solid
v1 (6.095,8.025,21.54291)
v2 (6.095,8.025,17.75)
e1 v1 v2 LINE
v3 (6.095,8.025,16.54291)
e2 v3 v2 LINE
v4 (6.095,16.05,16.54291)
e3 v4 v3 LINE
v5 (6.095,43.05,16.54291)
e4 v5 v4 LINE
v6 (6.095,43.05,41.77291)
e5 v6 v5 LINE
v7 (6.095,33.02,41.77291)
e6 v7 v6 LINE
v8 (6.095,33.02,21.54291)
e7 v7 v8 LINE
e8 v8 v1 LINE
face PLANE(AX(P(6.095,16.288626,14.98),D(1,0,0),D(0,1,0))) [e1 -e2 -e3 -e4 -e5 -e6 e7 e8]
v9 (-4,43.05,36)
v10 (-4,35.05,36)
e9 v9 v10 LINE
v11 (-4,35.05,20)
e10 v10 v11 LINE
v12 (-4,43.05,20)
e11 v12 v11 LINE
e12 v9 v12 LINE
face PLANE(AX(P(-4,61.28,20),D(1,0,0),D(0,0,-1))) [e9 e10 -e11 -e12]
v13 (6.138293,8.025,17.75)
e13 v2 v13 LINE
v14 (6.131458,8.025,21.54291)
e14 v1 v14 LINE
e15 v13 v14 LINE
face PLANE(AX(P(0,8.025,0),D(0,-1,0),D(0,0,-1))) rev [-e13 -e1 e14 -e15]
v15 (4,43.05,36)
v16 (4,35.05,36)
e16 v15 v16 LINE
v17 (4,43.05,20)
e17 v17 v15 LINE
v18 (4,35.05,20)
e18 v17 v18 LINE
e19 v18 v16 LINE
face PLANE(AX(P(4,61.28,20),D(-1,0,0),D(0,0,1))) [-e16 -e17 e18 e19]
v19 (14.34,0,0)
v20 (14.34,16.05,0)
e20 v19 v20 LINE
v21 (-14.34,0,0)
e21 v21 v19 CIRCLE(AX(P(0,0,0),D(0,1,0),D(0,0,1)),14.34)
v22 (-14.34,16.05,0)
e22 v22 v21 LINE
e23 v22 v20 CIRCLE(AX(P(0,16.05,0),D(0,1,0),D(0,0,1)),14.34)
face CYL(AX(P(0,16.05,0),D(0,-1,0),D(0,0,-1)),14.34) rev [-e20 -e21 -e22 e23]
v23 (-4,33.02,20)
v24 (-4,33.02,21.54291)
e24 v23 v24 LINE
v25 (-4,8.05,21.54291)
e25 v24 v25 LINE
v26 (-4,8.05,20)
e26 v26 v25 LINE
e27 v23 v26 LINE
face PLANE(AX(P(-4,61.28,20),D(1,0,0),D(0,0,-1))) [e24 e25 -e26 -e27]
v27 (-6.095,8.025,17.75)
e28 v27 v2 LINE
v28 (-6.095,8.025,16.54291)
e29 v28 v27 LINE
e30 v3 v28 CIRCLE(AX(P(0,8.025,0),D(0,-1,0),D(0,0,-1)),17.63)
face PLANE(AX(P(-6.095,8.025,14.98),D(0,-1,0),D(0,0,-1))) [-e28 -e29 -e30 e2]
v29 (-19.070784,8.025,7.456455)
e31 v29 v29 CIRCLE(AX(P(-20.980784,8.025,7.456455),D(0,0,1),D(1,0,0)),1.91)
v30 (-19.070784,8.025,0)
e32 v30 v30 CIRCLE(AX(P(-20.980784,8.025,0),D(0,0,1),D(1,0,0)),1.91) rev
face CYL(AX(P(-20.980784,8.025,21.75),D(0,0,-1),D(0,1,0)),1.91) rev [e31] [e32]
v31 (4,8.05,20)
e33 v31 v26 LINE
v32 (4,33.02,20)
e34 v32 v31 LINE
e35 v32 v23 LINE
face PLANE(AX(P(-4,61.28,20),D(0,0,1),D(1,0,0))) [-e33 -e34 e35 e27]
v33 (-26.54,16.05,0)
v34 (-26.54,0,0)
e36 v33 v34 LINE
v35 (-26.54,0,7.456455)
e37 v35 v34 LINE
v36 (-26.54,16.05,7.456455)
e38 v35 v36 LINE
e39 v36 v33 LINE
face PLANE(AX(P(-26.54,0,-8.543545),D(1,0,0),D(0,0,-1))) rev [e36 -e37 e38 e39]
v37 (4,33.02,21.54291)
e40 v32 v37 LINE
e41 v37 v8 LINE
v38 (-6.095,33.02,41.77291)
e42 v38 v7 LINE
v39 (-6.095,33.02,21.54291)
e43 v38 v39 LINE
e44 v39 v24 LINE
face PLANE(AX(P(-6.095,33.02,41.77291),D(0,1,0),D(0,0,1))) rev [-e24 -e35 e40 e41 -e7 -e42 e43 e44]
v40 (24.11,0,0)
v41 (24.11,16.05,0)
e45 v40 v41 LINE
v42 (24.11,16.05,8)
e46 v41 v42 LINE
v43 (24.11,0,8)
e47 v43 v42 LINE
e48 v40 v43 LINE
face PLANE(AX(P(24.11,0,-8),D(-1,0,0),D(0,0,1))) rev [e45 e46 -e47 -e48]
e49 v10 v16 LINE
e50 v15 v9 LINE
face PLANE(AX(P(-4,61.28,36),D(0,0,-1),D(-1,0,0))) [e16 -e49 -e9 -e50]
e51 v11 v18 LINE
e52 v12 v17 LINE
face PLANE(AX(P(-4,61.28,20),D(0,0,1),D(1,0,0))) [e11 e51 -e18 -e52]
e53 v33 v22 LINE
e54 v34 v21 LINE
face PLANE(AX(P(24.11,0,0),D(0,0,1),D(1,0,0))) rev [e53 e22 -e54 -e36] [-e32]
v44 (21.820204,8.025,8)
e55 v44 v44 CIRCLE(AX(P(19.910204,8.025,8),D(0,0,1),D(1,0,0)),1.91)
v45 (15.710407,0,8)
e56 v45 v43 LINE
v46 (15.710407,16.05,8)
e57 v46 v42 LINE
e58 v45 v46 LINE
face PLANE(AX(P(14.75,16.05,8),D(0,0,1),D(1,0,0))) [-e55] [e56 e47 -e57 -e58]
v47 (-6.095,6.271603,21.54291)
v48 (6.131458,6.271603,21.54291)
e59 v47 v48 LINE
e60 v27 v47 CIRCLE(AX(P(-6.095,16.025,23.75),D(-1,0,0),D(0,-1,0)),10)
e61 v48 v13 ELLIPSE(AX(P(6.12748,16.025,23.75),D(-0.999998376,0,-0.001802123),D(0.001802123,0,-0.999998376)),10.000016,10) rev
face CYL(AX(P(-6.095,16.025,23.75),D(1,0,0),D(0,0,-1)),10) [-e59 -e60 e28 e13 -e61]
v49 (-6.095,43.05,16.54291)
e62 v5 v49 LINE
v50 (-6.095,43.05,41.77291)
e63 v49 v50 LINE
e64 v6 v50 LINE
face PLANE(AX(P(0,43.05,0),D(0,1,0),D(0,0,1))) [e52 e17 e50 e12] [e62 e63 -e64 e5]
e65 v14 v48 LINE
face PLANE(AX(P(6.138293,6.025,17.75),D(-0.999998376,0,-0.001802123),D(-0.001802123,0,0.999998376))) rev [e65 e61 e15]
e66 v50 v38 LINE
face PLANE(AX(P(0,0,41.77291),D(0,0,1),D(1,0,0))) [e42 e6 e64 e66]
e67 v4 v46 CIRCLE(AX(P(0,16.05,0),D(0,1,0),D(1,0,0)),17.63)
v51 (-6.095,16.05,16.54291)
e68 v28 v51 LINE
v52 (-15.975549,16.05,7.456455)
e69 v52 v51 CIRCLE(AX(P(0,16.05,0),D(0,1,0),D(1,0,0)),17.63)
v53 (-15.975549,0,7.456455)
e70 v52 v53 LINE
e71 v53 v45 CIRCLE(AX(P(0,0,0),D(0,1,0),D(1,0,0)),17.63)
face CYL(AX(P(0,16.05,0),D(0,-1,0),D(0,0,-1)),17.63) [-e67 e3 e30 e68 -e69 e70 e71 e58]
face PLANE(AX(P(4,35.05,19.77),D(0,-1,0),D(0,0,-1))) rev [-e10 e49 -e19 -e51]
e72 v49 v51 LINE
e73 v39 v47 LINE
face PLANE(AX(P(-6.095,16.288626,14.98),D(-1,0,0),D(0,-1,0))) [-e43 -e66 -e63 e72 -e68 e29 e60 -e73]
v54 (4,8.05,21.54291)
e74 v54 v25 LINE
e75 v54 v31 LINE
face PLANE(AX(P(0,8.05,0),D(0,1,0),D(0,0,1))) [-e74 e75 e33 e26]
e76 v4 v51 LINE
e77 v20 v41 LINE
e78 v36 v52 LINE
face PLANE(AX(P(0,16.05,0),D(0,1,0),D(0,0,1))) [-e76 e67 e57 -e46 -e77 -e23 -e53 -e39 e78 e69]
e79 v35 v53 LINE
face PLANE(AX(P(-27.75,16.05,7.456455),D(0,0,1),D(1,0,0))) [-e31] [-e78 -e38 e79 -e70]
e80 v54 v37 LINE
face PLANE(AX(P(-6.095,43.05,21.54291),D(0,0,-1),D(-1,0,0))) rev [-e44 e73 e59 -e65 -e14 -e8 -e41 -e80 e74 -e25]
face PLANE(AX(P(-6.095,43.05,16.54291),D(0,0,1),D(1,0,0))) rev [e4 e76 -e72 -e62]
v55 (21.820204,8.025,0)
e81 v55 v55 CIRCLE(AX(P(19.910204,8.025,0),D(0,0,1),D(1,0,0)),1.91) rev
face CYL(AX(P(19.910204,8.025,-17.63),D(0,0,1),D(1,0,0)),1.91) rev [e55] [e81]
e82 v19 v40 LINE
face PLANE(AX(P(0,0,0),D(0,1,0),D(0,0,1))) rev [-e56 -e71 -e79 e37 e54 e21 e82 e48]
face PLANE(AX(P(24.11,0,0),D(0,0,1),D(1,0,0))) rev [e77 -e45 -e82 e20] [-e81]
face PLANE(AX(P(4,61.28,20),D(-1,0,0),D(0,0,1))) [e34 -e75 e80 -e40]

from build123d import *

# Parameters (mm, degrees)
SKETCH_1_R                = 17.63
SKETCH_1_R_2              = 14.34
EXTRUDE_1_DEPTH           = 16.05
EXTRUDE_1_2_DEPTH         = 9.77
EXTRUDE_1_2_DEPTH_BACK    = 3
SKETCH_2_W                = 16
SKETCH_2_H                = 16.05
SKETCH_3_W                = 3.41
SKETCH_3_H                = 16
CUT_EXTRUDE_1_DEPTH       = 37.411121927
SKETCH_4_R                = 1.91
CUT_EXTRUDE_2_DEPTH       = 39.675463798
EXTRUDE_2_DEPTH           = 4
EXTRUDE_2_DEPTH_BACK      = 2.77
SKETCH_5_W                = 12.19
SKETCH_5_H                = 8.263625949
SKETCH_6_W                = 12.19
SKETCH_6_H                = 6.77
EXTRUDE_3_DEPTH           = 63
SKETCH_8_W                = 12.19
SKETCH_8_H                = 6.77
EXTRUDE_4_DEPTH           = 0.16
EXTRUDE_5_DEPTH           = 3.16
EXTRUDE_5_DEPTH_BACK      = 10
SKETCH_12_W               = 16
SKETCH_12_H               = 16.05
SKETCH_13_W               = 1.21
SKETCH_13_H               = 16
CUT_EXTRUDE_3_DEPTH       = 73.543164889
SKETCH_14_R               = 1.91
CUT_EXTRUDE_4_DEPTH       = 90.07387176
SKETCH_15_R               = 4.05
CUT_EXTRUDE_5_DEPTH       = 24
SKETCH_16_W               = 56.400519221
SKETCH_16_H               = 19.935010357
CUT_EXTRUDE_6_DEPTH       = 73.088971918
SKETCH_17_W               = 12.19
SKETCH_17_H               = 71.423625949
EXTRUDE_7_DEPTH           = 25
SKETCH_18_W               = 26.793372528
SKETCH_18_H               = 63.398625949
CUT_EXTRUDE_7_DEPTH       = 25
SKETCH_19_R               = 4
CUT_EXTRUDE_8_DEPTH       = 24
CUT_EXTRUDE_9_DEPTH       = 29
EXTRUDE_9_DEPTH           = 2
FILLET_1_R                = 10
SKETCH_24_W               = 12.19
SKETCH_24_H               = 5
EXTRUDE_10_DEPTH          = 27
SKETCH_27_W               = 12.19
SKETCH_27_H               = 10.03
EXTRUDE_11_DEPTH          = 20.23
CUT_EXTRUDE_10_DEPTH      = 45.23
CUT_EXTRUDE_10_DEPTH_BACK = 8
SKETCH_21_W               = 8
SKETCH_21_H               = 16
SKETCH_25_W               = 20.230462415
SKETCH_25_H               = 10.025
CUT_EXTRUDE_12_DEPTH      = 20.23
SKETCH_31_W               = 8
SKETCH_31_H               = 2.03
EXTRUDE_13_DEPTH          = 16.23


with BuildPart() as part:
    # 草圖1 → Extrude 1 (new body)
    with BuildSketch(Plane(origin=(0, 0, 0), x_dir=(1, 0, 0), z_dir=(0, 1, 0))):
        Circle(SKETCH_1_R)
        Circle(SKETCH_1_R_2, mode=Mode.SUBTRACT)
    extrude(amount=EXTRUDE_1_DEPTH)

    # 草圖2 → Extrude 1 2 (add, two sides: drawn at the far end of the back side and taken through both)
    with BuildSketch(Plane(origin=(17.75, 0, 0), x_dir=(0, 0, -1), z_dir=(1, 0, 0)).offset(-EXTRUDE_1_2_DEPTH_BACK)):
        with Locations((0, 8.025)):
            Rectangle(SKETCH_2_W, SKETCH_2_H)
    extrude(amount=EXTRUDE_1_2_DEPTH + EXTRUDE_1_2_DEPTH_BACK)

    # 草圖3 → 除料-伸長1 (cut, through all)
    with BuildSketch(Plane(origin=(0, 16.05, 0), x_dir=(1, 0, 0), z_dir=(0, 1, 0))):
        with Locations((25.815, 0)):
            Rectangle(SKETCH_3_W, SKETCH_3_H)
    extrude(amount=-CUT_EXTRUDE_1_DEPTH, mode=Mode.SUBTRACT)

    # 草圖4 → 除料-伸長2 (cut, through all)
    with BuildSketch(Plane.XY.offset(8)):
        with Locations((19.910203689, 8.025)):
            Circle(SKETCH_4_R)
    extrude(amount=-CUT_EXTRUDE_2_DEPTH, mode=Mode.SUBTRACT)

    # 草圖5 → 填料-伸長2 (add, two sides: drawn at the far end of the back side and taken through both)
    with BuildSketch(Plane.XY.offset(17.75).offset(-EXTRUDE_2_DEPTH_BACK)):
        with Locations((0, 12.156812974)):
            Rectangle(SKETCH_5_W, SKETCH_5_H)
    extrude(amount=EXTRUDE_2_DEPTH + EXTRUDE_2_DEPTH_BACK)

    # 草圖6 → 填料-伸長3 (add)
    with BuildSketch(Plane(origin=(0, 16.288625949, 0), x_dir=(1, 0, 0), z_dir=(0, 1, 0))):
        with Locations((0, -18.365)):
            Rectangle(SKETCH_6_W, SKETCH_6_H)
    extrude(amount=EXTRUDE_3_DEPTH)

    # 草圖8 → 填料-伸長4 (add)
    with BuildSketch(Plane(origin=(0, 79.288625949, 0), x_dir=(1, 0, 0), z_dir=(0, 1, 0))):
        with Locations((0, -18.365)):
            Rectangle(SKETCH_8_W, SKETCH_8_H)
    extrude(amount=EXTRUDE_4_DEPTH)

    # 草圖12 → 填料-伸長5 (add, two sides: drawn at the far end of the back side and taken through both)
    with BuildSketch(Plane(origin=(-17.75, 0, 0), x_dir=(0, 0, -1), z_dir=(1, 0, 0)).offset(-EXTRUDE_5_DEPTH_BACK)):
        with Locations((0.543544944, 8.025)):
            Rectangle(SKETCH_12_W, SKETCH_12_H)
    extrude(amount=EXTRUDE_5_DEPTH + EXTRUDE_5_DEPTH_BACK)

    # 草圖13 → 除料-伸長3 (cut, through all)
    with BuildSketch(Plane(origin=(0, 16.05, 0), x_dir=(1, 0, 0), z_dir=(0, 1, 0))):
        with Locations((-27.145, 0.543544944)):
            Rectangle(SKETCH_13_W, SKETCH_13_H)
    extrude(amount=-CUT_EXTRUDE_3_DEPTH, mode=Mode.SUBTRACT)

    # 草圖14 → 除料-伸長4 (cut, through all)
    with BuildSketch(Plane(origin=(0, 0, -8.543544944), x_dir=(-1, 0, 0), z_dir=(0, 0, -1))):
        with Locations(Location((20.980783679, 8.025, 0), (0, 0, 90))):
            Circle(SKETCH_14_R)
    extrude(amount=-CUT_EXTRUDE_4_DEPTH, mode=Mode.SUBTRACT)

    # 草圖15 → 除料-伸長5 (cut)
    with BuildSketch(Plane(origin=(0, 79.448625949, 0), x_dir=(1, 0, 0), z_dir=(0, 1, 0))):
        with Locations((0, -14.98)):
            Circle(SKETCH_15_R)
    extrude(amount=-CUT_EXTRUDE_5_DEPTH, mode=Mode.SUBTRACT)

    # 草圖16 → 除料-伸長6 (cut, through all)
    with BuildSketch(Plane(origin=(0, 16.05, 0), x_dir=(1, 0, 0), z_dir=(0, 1, 0))):
        with Locations((-4.090259611, 9.967505179)):
            Rectangle(SKETCH_16_W, SKETCH_16_H)
    extrude(amount=-CUT_EXTRUDE_6_DEPTH, mode=Mode.SUBTRACT)

    # 草圖17 → 填料-伸長7 (add)
    with BuildSketch(Plane.XY.offset(21.75)):
        with Locations((0, 43.736812975)):
            Rectangle(SKETCH_17_W, SKETCH_17_H)
    extrude(amount=EXTRUDE_7_DEPTH)

    # 草圖18 → 除料-伸長7 (cut)
    with BuildSketch(Plane.ZY.offset(6.095)):
        with Locations((28.376686264, 47.749312975)):
            Rectangle(SKETCH_18_W, SKETCH_18_H)
    extrude(amount=-CUT_EXTRUDE_7_DEPTH, mode=Mode.SUBTRACT)

    # 草圖19 → 除料-伸長8 (cut)
    with BuildSketch(Plane(origin=(0, 79.448625949, 0), x_dir=(1, 0, 0), z_dir=(0, 1, 0))):
        with Locations((0, -41.773372528)):
            Circle(SKETCH_19_R)
    extrude(amount=-CUT_EXTRUDE_8_DEPTH, mode=Mode.SUBTRACT)

    # 草圖20 → 除料-伸長9 (cut)
    with BuildSketch(Plane(origin=(6.095, 0, 0), x_dir=(0, 0, -1), z_dir=(1, 0, 0))):
        Polygon((-41.773372528, 16.05), (-41.773372528, 8.025), (-46.75, 8.025), (-46.75, 79.448625949), (-41.773372528, 79.448625949), align=None)
    extrude(amount=-CUT_EXTRUDE_9_DEPTH, mode=Mode.SUBTRACT)

    # 草圖23 → 填料-伸長9 (add)
    with BuildSketch(Plane.XZ.offset(-8.025)):
        Polygon((-6.095, 41.773372528), (-6.095, 17.75), (6.13829314, 17.75), (6.095, 41.773372528), align=None)
    extrude(amount=EXTRUDE_9_DEPTH)

    # 圓角1
    # the kernel refuses this fillet: 10 mm, written as the material it takes off along each edge
    with BuildSketch(Plane(origin=(-21.095, 6.025, 17.75), x_dir=(0, 1, 0), z_dir=(1, 0, 0))) as fillet_1_piece_1:
        with BuildLine():
            CenterArc((10, 6), FILLET_1_R, 180, 36.869897646)
            Line((0, 6), (0, 0))
            Line((0, 0), (2, 0))
        make_face()
    extrude(amount=42.23329314, mode=Mode.SUBTRACT)

    # 草圖24 → 填料-伸長10 (add)
    with BuildSketch(Plane(origin=(0, 16.05, 0), x_dir=(1, 0, 0), z_dir=(0, 1, 0))):
        with Locations((0, -19.042910113)):
            Rectangle(SKETCH_24_W, SKETCH_24_H)
    extrude(amount=EXTRUDE_10_DEPTH)

    # 草圖27 → 填料-伸長11 (add)
    with BuildSketch(Plane.XY.offset(21.542910113)):
        with Locations((0, 38.035)):
            Rectangle(SKETCH_27_W, SKETCH_27_H)
    extrude(amount=EXTRUDE_11_DEPTH)

    # 草圖21 → 除料-伸長10 (cut, two sides: drawn at the far end of the back side and taken through both)
    with BuildSketch(Plane(origin=(0, 16.05, 0), x_dir=(1, 0, 0), z_dir=(0, 1, 0)).offset(-CUT_EXTRUDE_10_DEPTH_BACK)):
        with Locations((0, -28)):
            Rectangle(SKETCH_21_W, SKETCH_21_H)
    extrude(amount=CUT_EXTRUDE_10_DEPTH + CUT_EXTRUDE_10_DEPTH_BACK, mode=Mode.SUBTRACT)

    # 草圖25 → 除料-伸長12 (cut)
    with BuildSketch(Plane.ZY.offset(6.095)):
        with Locations((31.658141321, 11.0375)):
            Rectangle(SKETCH_25_W, SKETCH_25_H)
    extrude(amount=-CUT_EXTRUDE_12_DEPTH, mode=Mode.SUBTRACT)

    # 草圖31 → 填料-伸長13 (add)
    with BuildSketch(Plane(origin=(0, 0, 36), x_dir=(-1, 0, 0), z_dir=(0, 0, -1))):
        with Locations((0, 34.035)):
            Rectangle(SKETCH_31_W, SKETCH_31_H)
    extrude(amount=EXTRUDE_13_DEPTH)


solid = part.part
